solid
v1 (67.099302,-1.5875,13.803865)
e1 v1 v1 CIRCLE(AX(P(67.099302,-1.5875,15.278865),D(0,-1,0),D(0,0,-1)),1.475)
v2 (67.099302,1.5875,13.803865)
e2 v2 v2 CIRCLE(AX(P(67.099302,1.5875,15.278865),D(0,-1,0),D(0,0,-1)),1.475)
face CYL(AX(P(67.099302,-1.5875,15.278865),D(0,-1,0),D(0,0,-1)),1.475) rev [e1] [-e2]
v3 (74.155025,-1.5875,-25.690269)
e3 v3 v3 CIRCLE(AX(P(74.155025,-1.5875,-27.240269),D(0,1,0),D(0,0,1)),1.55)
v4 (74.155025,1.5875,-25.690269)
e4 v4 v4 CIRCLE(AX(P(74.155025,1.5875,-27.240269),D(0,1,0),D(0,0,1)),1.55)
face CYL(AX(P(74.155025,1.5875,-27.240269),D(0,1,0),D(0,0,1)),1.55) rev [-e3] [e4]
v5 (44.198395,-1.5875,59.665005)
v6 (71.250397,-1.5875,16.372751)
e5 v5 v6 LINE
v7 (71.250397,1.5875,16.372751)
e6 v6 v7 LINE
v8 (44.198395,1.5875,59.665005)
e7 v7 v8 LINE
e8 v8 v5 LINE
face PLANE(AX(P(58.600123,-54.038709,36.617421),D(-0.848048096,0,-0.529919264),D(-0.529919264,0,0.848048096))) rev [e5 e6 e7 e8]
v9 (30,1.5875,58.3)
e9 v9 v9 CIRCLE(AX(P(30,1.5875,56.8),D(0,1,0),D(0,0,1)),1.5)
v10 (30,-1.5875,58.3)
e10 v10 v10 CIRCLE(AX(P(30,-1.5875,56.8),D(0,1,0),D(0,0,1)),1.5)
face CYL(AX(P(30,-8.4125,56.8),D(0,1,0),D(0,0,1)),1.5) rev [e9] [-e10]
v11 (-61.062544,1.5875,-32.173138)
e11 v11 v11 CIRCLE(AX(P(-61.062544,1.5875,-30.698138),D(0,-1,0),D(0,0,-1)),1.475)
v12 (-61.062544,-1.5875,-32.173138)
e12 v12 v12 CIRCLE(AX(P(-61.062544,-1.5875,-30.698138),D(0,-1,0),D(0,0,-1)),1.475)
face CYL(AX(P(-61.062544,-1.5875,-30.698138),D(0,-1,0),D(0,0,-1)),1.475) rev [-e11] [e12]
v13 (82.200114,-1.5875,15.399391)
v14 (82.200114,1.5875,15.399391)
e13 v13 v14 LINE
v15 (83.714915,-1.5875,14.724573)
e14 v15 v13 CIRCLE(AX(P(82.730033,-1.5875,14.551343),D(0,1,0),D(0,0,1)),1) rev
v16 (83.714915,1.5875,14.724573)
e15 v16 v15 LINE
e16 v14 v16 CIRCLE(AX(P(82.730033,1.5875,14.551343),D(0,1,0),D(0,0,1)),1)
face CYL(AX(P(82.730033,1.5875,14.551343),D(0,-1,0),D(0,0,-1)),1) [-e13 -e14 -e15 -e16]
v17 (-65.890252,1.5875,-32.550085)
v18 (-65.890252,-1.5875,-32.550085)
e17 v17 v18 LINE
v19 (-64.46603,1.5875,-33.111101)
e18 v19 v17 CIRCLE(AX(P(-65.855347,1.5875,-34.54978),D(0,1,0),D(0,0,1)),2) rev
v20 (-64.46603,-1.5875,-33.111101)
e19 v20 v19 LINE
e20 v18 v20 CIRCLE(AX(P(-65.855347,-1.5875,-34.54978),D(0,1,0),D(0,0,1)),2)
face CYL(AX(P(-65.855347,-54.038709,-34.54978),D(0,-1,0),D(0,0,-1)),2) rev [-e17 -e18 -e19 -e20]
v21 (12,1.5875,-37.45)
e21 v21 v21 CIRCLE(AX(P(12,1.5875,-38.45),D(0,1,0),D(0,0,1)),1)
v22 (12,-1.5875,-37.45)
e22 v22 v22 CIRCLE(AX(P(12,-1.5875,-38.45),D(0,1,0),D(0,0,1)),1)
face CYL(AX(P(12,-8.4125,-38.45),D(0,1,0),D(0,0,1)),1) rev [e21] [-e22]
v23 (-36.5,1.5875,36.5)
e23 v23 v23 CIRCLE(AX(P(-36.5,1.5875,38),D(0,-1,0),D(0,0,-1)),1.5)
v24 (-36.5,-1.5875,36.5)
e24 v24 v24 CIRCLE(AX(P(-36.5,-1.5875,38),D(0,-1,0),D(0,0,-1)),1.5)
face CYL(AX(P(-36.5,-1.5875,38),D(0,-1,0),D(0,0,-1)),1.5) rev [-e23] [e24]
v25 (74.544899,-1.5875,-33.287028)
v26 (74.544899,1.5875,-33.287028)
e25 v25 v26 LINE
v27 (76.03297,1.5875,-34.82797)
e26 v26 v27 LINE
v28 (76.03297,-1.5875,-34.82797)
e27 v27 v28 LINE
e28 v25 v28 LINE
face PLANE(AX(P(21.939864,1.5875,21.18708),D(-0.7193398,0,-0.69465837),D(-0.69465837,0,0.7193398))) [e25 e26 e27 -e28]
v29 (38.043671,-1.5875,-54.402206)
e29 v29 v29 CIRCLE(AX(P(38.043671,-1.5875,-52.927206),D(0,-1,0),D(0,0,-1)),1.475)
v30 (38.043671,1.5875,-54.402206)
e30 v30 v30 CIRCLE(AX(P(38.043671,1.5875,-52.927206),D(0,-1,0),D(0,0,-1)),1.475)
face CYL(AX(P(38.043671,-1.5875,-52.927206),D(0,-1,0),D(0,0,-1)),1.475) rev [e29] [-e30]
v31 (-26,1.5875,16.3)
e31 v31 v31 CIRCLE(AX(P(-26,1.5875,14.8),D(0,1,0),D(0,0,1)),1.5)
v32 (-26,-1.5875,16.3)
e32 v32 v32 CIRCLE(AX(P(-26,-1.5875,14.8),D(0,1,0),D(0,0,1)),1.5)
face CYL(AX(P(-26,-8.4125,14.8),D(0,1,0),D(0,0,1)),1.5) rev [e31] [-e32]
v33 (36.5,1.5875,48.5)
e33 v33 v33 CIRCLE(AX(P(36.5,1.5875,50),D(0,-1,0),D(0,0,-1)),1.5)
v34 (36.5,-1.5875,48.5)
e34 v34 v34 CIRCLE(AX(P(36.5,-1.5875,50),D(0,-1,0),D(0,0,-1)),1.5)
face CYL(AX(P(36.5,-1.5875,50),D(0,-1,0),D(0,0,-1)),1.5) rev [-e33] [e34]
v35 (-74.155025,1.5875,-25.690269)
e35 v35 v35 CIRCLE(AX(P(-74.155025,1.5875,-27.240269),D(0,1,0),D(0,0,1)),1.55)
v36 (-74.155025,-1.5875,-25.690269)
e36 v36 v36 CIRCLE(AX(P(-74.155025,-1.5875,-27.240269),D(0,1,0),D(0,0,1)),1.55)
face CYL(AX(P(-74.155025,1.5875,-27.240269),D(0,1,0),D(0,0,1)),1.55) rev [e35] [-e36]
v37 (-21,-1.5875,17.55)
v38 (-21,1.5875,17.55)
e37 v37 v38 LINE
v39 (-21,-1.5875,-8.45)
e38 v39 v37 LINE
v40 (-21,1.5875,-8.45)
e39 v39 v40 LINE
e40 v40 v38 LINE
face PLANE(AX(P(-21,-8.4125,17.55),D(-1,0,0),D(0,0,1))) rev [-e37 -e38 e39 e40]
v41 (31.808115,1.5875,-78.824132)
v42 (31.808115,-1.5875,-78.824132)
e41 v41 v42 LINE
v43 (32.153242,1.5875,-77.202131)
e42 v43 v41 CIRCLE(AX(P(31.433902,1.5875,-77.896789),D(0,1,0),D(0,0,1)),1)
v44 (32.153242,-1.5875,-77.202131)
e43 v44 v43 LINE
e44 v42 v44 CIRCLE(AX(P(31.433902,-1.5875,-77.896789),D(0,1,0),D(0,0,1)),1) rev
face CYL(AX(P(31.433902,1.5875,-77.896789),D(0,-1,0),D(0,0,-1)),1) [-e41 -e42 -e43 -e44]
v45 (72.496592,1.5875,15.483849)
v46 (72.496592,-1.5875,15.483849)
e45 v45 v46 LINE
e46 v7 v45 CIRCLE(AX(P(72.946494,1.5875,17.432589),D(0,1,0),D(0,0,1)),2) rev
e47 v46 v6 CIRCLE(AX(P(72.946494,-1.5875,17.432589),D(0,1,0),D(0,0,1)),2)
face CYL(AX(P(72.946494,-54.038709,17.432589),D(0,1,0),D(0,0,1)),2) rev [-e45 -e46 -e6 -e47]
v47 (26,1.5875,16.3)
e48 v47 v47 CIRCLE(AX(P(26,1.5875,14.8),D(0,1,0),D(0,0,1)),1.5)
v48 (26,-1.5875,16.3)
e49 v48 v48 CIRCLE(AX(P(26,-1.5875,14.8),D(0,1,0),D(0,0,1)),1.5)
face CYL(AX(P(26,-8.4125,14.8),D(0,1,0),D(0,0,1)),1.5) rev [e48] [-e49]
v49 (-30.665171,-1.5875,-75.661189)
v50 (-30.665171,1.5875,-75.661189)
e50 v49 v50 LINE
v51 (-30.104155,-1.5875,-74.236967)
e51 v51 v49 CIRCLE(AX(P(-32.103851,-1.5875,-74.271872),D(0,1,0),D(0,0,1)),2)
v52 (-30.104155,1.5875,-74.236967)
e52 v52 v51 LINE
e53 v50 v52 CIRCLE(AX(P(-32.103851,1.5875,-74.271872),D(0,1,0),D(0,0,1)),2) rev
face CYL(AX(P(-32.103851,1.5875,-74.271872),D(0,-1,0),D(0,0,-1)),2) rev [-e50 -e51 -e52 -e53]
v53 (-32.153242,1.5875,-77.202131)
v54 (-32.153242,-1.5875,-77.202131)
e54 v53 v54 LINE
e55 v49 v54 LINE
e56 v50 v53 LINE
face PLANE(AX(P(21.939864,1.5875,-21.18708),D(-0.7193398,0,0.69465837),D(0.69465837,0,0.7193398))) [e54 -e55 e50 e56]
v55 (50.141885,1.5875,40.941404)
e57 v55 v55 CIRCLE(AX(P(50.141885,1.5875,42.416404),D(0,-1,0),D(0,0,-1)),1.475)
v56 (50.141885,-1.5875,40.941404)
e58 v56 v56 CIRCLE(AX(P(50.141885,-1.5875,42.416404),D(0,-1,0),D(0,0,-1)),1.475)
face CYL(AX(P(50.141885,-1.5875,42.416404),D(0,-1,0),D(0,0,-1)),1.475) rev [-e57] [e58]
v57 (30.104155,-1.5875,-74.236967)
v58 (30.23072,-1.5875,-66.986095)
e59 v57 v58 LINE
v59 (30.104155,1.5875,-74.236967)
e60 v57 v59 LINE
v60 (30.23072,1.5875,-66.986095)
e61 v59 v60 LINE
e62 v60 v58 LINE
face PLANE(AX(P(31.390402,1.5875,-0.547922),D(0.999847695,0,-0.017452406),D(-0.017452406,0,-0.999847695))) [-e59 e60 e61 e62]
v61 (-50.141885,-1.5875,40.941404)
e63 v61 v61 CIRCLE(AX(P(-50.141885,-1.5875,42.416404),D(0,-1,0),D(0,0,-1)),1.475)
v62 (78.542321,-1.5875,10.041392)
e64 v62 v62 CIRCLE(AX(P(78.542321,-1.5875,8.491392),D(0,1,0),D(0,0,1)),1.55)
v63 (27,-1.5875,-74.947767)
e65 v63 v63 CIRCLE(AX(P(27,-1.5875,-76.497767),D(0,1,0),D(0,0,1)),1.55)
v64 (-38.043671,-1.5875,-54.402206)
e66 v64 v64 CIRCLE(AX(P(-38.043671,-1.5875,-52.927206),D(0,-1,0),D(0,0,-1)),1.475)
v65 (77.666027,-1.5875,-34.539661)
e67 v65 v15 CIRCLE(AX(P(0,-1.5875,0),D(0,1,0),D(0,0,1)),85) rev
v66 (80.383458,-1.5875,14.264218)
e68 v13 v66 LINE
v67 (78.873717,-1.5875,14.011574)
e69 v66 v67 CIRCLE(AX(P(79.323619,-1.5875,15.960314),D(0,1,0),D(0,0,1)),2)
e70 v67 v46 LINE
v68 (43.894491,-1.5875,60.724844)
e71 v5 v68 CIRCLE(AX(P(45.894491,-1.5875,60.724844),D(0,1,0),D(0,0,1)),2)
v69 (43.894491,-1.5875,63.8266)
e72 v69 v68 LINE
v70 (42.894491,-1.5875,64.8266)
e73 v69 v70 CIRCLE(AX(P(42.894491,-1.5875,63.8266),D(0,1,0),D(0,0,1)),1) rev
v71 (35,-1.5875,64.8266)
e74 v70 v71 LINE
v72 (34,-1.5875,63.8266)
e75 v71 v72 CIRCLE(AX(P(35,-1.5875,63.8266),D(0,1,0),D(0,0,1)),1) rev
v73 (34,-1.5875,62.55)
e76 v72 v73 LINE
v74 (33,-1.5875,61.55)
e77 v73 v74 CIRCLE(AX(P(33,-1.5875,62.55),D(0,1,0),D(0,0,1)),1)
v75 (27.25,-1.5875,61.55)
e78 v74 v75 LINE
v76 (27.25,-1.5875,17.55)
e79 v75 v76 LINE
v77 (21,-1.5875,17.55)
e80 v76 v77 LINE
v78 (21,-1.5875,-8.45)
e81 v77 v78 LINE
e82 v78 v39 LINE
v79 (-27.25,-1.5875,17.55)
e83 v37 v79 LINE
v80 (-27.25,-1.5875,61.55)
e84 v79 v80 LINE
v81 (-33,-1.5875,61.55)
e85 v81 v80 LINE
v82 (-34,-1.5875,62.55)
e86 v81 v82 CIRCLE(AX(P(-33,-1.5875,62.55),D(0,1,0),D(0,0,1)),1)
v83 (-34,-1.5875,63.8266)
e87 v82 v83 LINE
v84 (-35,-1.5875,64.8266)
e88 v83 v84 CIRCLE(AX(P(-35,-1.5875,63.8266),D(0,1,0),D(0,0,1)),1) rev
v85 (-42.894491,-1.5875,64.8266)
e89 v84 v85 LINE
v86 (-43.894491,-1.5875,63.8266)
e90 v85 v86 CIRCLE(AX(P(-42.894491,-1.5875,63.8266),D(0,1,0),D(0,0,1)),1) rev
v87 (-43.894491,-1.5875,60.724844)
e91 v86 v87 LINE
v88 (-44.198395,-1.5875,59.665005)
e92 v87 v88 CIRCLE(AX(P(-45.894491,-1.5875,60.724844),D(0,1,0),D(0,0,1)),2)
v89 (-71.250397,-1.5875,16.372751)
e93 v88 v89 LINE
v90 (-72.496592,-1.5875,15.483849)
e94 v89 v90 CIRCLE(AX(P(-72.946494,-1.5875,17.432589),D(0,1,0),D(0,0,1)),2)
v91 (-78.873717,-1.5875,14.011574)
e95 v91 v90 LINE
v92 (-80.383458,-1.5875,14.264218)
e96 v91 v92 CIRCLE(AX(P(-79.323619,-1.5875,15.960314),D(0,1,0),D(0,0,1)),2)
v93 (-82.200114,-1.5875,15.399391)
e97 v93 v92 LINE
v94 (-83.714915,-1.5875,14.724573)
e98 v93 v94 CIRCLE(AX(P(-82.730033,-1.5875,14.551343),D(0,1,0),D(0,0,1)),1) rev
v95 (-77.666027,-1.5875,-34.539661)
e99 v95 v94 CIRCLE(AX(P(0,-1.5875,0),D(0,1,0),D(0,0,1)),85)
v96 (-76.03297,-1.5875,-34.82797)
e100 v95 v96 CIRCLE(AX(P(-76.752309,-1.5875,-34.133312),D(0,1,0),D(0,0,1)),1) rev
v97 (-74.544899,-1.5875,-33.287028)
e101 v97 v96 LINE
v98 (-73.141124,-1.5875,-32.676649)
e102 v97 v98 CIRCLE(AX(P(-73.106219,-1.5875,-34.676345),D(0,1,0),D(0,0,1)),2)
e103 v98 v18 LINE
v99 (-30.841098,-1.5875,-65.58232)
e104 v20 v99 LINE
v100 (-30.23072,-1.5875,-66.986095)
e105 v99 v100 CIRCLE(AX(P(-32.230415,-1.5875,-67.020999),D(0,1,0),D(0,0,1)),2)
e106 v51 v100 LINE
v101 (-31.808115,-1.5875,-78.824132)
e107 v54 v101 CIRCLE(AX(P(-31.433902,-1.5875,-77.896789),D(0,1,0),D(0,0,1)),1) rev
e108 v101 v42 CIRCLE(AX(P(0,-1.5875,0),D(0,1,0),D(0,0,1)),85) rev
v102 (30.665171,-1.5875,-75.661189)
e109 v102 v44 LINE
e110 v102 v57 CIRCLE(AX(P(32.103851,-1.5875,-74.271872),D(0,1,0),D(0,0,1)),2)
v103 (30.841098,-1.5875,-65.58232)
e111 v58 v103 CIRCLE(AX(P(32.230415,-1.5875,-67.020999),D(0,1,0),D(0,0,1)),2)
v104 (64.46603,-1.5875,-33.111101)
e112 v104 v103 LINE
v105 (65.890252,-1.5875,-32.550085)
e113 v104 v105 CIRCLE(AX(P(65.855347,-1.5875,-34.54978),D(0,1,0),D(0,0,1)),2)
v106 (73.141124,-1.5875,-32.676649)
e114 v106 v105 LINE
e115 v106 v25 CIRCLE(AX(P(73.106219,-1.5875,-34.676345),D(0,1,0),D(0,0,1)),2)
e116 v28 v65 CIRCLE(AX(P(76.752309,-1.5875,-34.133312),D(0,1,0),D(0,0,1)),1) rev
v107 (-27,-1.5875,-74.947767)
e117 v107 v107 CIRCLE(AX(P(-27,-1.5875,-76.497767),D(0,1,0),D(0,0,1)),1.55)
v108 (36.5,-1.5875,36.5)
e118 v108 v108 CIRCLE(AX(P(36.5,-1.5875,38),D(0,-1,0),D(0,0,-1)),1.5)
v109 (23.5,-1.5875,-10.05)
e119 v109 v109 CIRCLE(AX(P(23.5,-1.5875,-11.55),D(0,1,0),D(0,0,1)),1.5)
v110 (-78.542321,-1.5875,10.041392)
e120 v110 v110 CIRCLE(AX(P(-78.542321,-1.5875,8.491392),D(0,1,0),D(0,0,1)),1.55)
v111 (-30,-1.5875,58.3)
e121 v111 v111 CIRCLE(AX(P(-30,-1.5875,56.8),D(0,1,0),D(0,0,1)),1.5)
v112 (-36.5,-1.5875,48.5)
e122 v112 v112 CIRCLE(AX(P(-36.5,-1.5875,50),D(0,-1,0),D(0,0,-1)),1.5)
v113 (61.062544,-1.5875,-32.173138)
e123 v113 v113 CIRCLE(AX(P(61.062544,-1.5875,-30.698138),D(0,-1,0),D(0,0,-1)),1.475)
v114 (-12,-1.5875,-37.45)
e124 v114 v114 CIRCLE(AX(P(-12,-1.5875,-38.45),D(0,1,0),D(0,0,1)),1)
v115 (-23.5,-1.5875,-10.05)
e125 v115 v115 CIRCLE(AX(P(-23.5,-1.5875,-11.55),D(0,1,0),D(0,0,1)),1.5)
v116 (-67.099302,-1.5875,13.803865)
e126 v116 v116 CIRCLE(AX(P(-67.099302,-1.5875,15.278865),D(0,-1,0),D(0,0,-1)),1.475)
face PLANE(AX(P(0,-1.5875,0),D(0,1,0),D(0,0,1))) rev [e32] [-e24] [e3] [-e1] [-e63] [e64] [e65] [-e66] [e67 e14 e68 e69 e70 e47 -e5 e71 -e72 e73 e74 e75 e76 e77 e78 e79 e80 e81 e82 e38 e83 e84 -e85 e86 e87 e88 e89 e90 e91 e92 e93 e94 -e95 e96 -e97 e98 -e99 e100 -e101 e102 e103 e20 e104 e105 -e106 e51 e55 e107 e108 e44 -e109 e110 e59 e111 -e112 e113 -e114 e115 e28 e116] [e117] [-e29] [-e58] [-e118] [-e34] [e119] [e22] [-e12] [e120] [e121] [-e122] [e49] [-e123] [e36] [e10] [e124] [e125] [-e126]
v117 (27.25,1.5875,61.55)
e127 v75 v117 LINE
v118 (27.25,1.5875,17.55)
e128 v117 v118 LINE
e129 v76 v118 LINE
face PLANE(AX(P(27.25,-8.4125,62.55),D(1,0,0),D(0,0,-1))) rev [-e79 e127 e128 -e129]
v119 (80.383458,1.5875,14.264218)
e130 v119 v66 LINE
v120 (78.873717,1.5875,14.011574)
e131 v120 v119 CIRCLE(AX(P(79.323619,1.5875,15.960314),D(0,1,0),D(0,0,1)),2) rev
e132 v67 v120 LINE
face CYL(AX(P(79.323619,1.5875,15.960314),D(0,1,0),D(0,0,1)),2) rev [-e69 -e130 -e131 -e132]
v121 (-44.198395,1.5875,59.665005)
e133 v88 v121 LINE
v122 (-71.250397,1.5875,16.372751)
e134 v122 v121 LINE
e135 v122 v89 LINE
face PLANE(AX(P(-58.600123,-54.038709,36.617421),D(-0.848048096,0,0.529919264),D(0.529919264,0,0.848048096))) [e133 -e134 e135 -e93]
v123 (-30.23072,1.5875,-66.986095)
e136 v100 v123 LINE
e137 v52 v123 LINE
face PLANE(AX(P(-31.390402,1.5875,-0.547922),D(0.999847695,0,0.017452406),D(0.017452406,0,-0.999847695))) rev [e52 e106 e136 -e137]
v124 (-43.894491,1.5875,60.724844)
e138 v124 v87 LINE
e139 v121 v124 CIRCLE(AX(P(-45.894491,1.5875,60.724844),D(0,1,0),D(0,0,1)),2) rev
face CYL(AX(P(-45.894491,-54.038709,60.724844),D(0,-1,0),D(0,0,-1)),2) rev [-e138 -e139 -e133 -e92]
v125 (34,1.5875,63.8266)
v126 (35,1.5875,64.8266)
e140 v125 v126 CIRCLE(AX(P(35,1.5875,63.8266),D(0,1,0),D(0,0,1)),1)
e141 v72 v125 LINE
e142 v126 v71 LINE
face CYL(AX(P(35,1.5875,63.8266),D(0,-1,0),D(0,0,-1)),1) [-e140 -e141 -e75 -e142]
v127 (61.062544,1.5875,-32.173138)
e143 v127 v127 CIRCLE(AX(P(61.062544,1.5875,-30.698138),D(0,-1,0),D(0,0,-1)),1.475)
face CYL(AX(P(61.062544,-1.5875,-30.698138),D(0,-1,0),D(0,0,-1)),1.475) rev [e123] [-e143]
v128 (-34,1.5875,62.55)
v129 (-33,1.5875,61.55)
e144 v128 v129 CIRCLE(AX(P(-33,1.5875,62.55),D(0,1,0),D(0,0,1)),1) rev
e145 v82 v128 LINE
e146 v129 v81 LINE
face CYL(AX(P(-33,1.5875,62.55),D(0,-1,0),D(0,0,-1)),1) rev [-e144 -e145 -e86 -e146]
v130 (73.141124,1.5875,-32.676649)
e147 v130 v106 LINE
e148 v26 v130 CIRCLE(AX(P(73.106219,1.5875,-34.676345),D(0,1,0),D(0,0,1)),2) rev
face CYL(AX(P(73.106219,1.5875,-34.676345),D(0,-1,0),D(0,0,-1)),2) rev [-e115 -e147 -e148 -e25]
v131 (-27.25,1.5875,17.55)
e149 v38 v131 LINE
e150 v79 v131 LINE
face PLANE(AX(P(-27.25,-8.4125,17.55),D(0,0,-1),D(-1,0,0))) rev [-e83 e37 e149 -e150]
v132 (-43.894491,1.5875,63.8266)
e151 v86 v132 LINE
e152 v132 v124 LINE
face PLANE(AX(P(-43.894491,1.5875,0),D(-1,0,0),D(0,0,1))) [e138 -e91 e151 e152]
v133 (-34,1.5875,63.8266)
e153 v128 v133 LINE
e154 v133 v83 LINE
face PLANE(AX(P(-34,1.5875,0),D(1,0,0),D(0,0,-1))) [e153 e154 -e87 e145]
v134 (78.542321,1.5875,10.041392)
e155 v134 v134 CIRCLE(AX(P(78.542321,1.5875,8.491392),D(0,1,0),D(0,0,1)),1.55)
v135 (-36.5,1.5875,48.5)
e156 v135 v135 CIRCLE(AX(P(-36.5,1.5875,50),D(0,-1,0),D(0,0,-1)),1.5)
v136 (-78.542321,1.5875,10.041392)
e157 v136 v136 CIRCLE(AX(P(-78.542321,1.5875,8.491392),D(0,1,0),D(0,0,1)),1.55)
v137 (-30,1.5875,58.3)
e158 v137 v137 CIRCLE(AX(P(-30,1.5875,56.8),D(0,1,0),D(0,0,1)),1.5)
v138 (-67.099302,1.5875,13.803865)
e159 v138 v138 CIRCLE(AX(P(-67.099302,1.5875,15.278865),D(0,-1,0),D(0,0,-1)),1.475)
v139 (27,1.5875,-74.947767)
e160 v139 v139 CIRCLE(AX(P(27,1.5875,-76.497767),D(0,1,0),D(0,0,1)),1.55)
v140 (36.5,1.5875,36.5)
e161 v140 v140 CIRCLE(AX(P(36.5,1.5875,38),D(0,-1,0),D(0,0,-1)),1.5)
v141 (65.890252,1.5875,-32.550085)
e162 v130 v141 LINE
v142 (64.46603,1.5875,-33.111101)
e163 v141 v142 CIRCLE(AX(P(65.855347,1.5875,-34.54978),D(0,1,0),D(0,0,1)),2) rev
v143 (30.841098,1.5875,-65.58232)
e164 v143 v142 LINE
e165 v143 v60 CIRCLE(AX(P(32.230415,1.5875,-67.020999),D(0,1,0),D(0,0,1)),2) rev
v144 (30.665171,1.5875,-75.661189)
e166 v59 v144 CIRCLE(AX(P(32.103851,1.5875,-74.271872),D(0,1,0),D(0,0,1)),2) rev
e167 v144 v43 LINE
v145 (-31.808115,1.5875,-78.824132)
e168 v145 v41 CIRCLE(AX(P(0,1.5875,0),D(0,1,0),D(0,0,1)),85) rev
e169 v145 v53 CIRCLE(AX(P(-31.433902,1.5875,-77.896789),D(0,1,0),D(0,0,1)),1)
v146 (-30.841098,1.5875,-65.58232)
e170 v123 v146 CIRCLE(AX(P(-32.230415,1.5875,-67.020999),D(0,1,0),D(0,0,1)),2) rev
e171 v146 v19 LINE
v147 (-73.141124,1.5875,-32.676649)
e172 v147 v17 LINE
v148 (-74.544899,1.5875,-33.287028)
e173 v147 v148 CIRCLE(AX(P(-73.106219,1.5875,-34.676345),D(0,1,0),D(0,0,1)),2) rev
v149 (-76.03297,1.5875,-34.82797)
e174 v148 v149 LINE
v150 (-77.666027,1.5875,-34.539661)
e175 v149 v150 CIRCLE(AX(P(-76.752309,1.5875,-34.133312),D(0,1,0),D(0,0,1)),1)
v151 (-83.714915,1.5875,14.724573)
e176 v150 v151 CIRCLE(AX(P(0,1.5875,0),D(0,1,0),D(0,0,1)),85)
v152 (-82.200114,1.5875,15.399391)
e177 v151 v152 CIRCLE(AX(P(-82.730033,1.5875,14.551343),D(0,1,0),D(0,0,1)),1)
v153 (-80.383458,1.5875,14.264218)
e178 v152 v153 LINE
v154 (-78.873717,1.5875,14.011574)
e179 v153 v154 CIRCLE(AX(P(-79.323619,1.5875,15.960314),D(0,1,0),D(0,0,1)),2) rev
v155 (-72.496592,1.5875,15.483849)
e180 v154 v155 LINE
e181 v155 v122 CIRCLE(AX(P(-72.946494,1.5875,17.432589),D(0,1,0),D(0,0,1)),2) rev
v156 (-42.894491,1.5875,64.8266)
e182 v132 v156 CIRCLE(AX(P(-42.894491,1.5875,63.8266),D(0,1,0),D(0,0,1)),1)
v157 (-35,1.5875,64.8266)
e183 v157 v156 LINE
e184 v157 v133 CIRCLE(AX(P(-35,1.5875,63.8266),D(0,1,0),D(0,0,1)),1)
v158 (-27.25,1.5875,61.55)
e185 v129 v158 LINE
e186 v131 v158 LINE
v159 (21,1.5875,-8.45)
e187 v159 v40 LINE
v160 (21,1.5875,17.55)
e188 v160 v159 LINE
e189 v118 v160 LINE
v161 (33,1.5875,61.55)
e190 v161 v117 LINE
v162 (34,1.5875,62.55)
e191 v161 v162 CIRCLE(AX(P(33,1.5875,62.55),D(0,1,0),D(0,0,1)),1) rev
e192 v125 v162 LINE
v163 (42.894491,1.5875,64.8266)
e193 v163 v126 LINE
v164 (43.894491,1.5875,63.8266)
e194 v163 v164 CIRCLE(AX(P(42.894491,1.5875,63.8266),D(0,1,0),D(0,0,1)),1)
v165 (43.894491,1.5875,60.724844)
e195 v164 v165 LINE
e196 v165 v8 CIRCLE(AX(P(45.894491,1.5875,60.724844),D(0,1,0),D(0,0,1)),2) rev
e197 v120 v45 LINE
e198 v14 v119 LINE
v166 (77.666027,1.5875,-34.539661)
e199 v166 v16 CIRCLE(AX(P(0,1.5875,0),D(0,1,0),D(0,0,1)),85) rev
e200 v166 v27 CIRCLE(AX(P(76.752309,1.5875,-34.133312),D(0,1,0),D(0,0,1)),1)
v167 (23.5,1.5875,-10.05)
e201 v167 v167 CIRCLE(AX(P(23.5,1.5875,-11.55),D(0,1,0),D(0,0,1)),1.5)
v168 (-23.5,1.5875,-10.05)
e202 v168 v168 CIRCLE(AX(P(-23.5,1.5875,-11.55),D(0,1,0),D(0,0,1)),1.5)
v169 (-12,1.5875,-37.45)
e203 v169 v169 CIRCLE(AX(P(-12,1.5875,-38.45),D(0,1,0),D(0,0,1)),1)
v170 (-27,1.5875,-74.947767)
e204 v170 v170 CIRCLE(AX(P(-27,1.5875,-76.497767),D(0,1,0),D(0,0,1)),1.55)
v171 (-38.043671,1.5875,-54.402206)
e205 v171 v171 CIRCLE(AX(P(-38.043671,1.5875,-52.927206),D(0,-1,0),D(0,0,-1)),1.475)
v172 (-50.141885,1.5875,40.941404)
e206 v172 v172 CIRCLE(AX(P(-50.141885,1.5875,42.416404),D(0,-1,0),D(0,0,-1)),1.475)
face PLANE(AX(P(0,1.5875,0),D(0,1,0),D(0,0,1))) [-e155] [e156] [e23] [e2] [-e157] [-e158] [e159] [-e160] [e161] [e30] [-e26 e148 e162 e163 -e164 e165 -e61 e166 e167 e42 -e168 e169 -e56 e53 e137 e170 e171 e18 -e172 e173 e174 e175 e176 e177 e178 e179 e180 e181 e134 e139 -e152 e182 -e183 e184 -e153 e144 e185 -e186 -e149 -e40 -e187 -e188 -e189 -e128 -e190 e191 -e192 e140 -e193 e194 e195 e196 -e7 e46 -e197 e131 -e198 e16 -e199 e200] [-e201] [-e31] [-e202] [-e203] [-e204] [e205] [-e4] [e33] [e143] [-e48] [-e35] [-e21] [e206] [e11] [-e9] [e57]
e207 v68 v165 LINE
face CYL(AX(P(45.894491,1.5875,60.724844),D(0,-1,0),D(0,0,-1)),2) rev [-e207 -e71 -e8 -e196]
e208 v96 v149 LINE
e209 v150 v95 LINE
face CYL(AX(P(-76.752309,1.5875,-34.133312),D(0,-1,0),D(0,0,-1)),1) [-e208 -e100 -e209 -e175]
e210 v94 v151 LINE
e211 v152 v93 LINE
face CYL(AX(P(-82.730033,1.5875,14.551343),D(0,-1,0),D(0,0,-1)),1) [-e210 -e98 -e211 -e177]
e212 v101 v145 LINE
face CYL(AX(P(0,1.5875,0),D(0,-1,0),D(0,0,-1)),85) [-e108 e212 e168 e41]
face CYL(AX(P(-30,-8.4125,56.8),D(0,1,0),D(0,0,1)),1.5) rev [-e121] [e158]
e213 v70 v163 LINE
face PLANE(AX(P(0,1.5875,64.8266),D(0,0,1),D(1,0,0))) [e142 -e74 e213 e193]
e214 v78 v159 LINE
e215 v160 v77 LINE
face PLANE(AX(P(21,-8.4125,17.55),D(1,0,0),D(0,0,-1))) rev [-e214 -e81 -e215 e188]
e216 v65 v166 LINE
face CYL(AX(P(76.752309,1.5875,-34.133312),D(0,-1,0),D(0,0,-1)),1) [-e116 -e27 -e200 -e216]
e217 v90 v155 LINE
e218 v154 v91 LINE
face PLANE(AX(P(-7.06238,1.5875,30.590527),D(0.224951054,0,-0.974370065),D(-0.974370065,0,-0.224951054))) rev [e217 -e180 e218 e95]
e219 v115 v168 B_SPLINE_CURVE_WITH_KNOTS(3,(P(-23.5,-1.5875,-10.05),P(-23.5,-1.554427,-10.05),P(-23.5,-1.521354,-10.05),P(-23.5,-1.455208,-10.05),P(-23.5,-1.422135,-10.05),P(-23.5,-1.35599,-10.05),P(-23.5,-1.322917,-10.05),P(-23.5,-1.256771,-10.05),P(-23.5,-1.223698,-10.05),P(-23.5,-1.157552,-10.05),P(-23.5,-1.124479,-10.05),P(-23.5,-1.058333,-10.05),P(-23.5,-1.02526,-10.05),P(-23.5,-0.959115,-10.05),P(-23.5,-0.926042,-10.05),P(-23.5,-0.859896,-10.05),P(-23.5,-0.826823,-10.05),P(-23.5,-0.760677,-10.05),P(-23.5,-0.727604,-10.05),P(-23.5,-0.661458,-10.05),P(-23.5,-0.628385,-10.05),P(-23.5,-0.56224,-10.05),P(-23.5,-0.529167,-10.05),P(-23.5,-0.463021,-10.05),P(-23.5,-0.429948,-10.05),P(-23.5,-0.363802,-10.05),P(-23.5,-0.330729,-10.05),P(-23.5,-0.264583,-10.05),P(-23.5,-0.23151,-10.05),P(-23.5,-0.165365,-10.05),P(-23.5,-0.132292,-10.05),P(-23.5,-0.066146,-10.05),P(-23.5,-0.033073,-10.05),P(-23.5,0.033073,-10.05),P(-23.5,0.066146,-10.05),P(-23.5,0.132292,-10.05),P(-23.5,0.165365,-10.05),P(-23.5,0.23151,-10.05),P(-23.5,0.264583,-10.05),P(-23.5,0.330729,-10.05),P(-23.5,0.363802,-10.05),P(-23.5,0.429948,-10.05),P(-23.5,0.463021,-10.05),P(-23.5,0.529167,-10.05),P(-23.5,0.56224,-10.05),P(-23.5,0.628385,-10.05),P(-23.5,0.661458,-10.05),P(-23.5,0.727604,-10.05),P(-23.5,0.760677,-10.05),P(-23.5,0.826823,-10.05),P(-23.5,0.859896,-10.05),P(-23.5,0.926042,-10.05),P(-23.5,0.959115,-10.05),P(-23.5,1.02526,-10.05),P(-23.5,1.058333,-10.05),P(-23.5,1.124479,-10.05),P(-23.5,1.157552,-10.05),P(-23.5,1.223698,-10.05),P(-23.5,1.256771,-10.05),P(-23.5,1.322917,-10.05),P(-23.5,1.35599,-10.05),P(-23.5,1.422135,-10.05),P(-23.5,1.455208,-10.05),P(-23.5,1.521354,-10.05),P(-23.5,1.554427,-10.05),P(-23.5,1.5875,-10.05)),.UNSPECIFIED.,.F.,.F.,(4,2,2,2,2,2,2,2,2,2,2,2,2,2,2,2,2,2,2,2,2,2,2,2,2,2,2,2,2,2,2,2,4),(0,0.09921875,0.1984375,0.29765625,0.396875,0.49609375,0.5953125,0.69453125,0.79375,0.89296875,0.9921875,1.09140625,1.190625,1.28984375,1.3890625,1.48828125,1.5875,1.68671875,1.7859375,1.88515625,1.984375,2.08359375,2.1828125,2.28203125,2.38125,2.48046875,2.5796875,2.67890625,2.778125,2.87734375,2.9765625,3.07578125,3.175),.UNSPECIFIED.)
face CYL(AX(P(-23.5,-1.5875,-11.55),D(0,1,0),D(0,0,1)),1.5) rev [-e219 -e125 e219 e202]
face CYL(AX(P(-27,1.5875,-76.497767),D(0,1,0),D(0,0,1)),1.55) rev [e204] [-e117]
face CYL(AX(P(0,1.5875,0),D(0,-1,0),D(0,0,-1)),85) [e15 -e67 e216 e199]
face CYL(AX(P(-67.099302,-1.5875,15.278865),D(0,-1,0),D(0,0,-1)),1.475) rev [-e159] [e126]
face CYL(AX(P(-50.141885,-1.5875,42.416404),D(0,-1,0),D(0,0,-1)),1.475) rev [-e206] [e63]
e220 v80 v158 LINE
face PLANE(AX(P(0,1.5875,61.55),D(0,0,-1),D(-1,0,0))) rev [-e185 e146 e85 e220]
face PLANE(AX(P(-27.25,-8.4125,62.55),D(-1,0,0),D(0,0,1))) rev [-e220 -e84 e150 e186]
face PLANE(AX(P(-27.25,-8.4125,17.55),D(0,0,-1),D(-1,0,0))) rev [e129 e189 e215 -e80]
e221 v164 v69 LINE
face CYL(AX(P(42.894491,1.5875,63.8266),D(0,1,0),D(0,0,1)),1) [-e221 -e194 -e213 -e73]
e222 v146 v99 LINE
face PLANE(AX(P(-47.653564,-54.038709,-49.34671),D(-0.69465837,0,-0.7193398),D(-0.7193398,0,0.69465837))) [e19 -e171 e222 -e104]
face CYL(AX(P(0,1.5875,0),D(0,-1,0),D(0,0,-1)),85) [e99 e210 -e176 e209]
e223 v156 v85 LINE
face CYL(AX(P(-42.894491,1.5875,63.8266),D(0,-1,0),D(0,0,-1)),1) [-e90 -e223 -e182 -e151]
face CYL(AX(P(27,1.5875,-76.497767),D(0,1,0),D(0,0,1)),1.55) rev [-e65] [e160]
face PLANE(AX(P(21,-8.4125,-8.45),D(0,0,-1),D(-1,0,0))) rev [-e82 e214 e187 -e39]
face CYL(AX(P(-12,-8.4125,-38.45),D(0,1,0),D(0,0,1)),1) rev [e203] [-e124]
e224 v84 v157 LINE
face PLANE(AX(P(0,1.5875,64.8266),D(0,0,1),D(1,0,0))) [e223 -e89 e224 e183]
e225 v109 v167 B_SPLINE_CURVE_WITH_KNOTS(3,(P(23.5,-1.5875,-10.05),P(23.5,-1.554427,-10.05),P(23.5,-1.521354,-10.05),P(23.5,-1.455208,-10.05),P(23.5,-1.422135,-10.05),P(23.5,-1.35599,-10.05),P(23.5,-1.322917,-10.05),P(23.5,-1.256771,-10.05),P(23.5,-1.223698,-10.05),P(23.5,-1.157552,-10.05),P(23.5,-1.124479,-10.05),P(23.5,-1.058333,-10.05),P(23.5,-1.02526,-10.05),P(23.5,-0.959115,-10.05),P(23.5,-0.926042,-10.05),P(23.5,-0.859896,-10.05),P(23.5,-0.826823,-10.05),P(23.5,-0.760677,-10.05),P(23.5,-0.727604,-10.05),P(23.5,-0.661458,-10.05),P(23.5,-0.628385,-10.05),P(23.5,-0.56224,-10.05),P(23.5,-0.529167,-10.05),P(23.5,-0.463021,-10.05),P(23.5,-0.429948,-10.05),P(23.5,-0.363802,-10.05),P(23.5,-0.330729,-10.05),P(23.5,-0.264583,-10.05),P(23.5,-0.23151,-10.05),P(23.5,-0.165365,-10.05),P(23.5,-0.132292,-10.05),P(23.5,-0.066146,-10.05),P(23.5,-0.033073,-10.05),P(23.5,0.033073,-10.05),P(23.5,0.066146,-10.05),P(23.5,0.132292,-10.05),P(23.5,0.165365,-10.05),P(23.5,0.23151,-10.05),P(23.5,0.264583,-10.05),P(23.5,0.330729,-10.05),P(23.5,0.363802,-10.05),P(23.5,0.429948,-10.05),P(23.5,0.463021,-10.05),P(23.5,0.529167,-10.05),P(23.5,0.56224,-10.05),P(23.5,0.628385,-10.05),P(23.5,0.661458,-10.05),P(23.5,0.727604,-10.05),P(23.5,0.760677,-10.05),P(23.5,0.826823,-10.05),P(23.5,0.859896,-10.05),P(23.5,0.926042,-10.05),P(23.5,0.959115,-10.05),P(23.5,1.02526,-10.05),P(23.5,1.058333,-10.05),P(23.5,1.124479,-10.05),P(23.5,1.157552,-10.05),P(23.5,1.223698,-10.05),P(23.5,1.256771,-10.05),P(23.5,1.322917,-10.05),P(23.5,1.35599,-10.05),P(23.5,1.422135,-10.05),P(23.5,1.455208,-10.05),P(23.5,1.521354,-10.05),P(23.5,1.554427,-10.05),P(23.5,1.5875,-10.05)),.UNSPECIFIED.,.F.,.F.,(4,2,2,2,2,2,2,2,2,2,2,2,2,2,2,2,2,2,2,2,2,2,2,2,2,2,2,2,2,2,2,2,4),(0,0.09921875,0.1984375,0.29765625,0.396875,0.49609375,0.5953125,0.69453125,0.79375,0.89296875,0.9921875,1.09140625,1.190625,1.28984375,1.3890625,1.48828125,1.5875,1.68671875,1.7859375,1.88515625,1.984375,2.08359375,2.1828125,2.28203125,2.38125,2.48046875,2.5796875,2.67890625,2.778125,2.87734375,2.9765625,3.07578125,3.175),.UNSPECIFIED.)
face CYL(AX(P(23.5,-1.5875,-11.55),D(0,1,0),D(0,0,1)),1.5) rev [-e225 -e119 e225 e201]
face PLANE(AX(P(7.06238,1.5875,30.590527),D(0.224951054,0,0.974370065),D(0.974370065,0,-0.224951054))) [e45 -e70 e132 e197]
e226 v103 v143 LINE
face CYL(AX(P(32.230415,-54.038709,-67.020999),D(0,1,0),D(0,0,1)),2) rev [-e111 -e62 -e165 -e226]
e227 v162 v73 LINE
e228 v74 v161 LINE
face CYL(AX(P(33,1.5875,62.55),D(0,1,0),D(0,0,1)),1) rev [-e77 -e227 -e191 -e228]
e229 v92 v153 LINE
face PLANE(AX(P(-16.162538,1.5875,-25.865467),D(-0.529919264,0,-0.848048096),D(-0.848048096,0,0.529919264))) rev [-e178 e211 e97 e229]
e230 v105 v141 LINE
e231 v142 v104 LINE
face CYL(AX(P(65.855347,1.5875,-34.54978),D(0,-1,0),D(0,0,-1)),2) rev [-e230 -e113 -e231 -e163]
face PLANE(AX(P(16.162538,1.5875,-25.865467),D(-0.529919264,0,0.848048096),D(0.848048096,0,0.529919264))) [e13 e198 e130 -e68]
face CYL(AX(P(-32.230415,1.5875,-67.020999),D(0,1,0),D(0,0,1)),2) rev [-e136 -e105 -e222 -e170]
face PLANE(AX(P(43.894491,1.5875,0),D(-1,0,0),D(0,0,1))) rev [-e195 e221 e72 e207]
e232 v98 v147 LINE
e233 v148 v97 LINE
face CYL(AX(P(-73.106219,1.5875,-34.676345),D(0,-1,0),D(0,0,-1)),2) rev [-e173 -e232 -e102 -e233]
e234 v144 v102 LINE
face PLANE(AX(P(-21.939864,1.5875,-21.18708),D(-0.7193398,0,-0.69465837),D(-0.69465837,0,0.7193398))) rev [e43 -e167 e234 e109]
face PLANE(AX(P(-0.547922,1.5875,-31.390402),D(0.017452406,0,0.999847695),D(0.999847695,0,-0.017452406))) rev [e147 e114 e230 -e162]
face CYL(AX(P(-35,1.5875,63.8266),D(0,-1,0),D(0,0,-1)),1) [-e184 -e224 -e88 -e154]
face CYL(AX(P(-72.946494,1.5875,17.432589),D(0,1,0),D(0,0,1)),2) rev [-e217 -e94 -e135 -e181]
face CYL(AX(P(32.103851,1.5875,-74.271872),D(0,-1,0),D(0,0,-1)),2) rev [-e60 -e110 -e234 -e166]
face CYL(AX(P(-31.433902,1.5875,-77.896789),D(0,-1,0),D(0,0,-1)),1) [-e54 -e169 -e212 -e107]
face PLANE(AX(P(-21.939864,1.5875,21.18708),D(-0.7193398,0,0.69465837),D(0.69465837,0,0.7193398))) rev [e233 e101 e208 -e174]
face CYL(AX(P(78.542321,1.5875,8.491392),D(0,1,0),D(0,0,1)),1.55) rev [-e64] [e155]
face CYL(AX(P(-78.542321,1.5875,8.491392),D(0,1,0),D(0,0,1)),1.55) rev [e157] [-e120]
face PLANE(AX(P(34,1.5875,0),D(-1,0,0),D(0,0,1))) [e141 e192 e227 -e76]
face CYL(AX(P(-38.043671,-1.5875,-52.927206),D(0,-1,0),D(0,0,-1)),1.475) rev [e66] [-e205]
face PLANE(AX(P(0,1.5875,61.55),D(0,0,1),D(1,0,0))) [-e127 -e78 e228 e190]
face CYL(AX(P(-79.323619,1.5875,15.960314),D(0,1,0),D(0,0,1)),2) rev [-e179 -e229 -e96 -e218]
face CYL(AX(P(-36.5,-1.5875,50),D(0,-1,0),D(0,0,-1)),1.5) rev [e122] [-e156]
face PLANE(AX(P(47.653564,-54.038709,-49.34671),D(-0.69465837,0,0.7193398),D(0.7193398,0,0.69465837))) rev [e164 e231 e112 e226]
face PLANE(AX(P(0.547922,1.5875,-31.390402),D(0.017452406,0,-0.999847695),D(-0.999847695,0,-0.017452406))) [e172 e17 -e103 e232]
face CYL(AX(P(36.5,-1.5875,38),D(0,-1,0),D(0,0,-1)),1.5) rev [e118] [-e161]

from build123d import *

# Parameters (mm, degrees)
BOSS_EXTRUDE4_DEPTH  = 1.5875
M3_CLEARANCE_HOLE3_D = 3
M3_CLEARANCE_HOLE1_D = 3.1
M3_CLEARANCE_HOLE4_D = 2.95
M3_CLEARANCE_HOLE2_D = 3.1
BOSS_EXTRUDE6_DEPTH  = 3.175
FILLET1_R            = 2
FILLET3_R            = 1
FILLET6_R            = 0.5
SKETCH28_W           = 54.5
SKETCH28_H           = 45
CUT_EXTRUDE4_DEPTH   = 10
CUT_EXTRUDE5_DEPTH   = 10
SKETCH30_W           = 42
SKETCH30_H           = 26
CUT_EXTRUDE6_DEPTH   = 10
SKETCH31_R           = 1.5
CUT_EXTRUDE7_DEPTH   = 10
SKETCH34_R           = 1
CUT_EXTRUDE9_DEPTH   = 10
SKETCH35_R           = 1.5
CUT_EXTRUDE10_DEPTH  = 121.250075508


with BuildPart() as part:
    # Sketch1 → Boss-Extrude4 (new, symmetric)
    with BuildSketch(Plane(origin=(0, 0, 0), x_dir=(1, 0, 0), z_dir=(0, 1, 0))):
        with BuildLine():
            Line((-62.799553621, 32.496136604), (-73.969425011, 32.691107434))
            Line((-73.969425011, 32.691107434), (-77.053684287, 35.88495141))
            ThreePointArc((-77.053684287, 35.88495141), (-84.36642289, 10.358894189), (-83.446216027, -16.178041625))
            Line((-83.446216027, -16.178041625), (-79.680911643, -13.825218315))
            Line((-79.680911643, -13.825218315), (-69.484649137, -16.179210996))
            Line((-69.484649137, -16.179210996), (-43.894490772, -57.132025032))
            Line((-43.894490772, -57.132025032), (-43.894490772, -64.826600275))
            Line((-43.894490772, -64.826600275), (-43.094490772, -64.826600275))
            Line((-43.094490772, -64.826600275), (-34, -64.826600275))
            Line((-34, -64.826600275), (-34, -62.55))
            Line((-34, -62.55), (-34, -61.55))
            Line((-34, -61.55), (-20, -61.55))
            Line((-20, -61.55), (-19.859459165, -62.55))
            Line((-19.859459165, -62.55), (19.859459165, -62.55))
            Line((19.859459165, -62.55), (20, -61.55))
            Line((20, -61.55), (34, -61.55))
            Line((34, -61.55), (34, -62.55))
            Line((34, -62.55), (34, -64.826600275))
            Line((34, -64.826600275), (43.094490772, -64.826600275))
            Line((43.094490772, -64.826600275), (43.894490772, -64.826600275))
            Line((43.894490772, -64.826600275), (43.894490772, -57.132025032))
            Line((43.894490772, -57.132025032), (69.484649137, -16.179210996))
            Line((69.484649137, -16.179210996), (79.680911643, -13.825218315))
            Line((79.680911643, -13.825218315), (83.446216027, -16.178041625))
            ThreePointArc((83.446216027, -16.178041625), (84.610662337, -8.126242604), (85, 0))
            ThreePointArc((85, 0), (82.98964744, 18.377116688), (77.053684287, 35.88495141))
            Line((77.053684287, 35.88495141), (73.969425011, 32.691107434))
            Line((73.969425011, 32.691107434), (62.799553621, 32.496136604))
            Line((62.799553621, 32.496136604), (30.284668021, 63.895396642))
            Line((30.284668021, 63.895396642), (30.089697191, 75.065268032))
            Line((30.089697191, 75.065268032), (33.173956467, 78.259112008))
            ThreePointArc((33.173956467, 78.259112008), (0, 85), (-33.173956467, 78.259112008))
            Line((-33.173956467, 78.259112008), (-30.089697191, 75.065268032))
            Line((-30.089697191, 75.065268032), (-30.284668021, 63.895396642))
            Line((-30.284668021, 63.895396642), (-62.799553621, 32.496136604))
        make_face()
    extrude(amount=BOSS_EXTRUDE4_DEPTH, both=True)

    # M3 Clearance Hole3 (through all)
    with Locations(Plane(origin=(0, -1.5875, 0), x_dir=(-1, 0, 0), z_dir=(0, -1, 0))):
        with Locations((36.5, -50), (36.5, -38), (-36.5, -50), (-36.5, -38)):
            Hole(M3_CLEARANCE_HOLE3_D / 2)

    # M3 Clearance Hole1 (through all)
    with Locations(Plane(origin=(0, 1.5875, 0), x_dir=(1, 0, 0), z_dir=(0, 1, 0))):
        with Locations((-78.542321426, -8.49139241), (78.542321426, -8.49139241), (74.155025063, 27.240269049), (-74.155025063, 27.240269049)):
            Hole(M3_CLEARANCE_HOLE1_D / 2)

    # M3 Clearance Hole4 (through all)
    with Locations(Plane(origin=(0, -1.5875, 0), x_dir=(-1, 0, 0), z_dir=(0, -1, 0))):
        with Locations((-67.099301622, -15.278865202), (-50.141885166, -42.416404279), (-61.062544382, 30.698137949), (-38.043670771, 52.927205804), (50.141885166, -42.416404279), (67.099301622, -15.278865202), (38.043670771, 52.927205804), (61.062544382, 30.698137949)):
            Hole(M3_CLEARANCE_HOLE4_D / 2)

    # M3 Clearance Hole2 (through all)
    with Locations(Plane(origin=(0, 1.5875, 0), x_dir=(1, 0, 0), z_dir=(0, 1, 0))):
        with Locations((27, 76.497766718), (-27, 76.497766718)):
            Hole(M3_CLEARANCE_HOLE2_D / 2)

    # Sketch22 → Boss-Extrude6 (add)
    with BuildSketch(Plane(origin=(0, 1.5875, 0), x_dir=(1, 0, 0), z_dir=(0, 1, 0))):
        Polygon((65.061950694, 32.535626892), (30.245177733, 66.157793715), (30.284668021, 63.895396642), (62.799553621, 32.496136604), align=None)
        Polygon((-30.284668021, 63.895396642), (-30.245177733, 66.157793715), (-65.061950694, 32.535626892), (-62.799553621, 32.496136604), align=None)
        Polygon((43.894490772, -60.151352895), (71.689396914, -15.670204865), (69.484649137, -16.179210996), (43.894490772, -57.132025032), align=None)
        Polygon((-69.484649137, -16.179210996), (-71.689396914, -15.670204865), (-43.894490772, -60.151352895), (-43.894490772, -57.132025032), align=None)
    extrude(amount=-BOSS_EXTRUDE6_DEPTH)

    # Fillet1
    fillet1_edges = [part.edges().sort_by_distance(p)[0] for p in [
        (-30.245177733, 0.79375, -66.157793715),
        (-65.061950694, 0.79375, -32.535626892),
        (-71.689396914, 0.79375, 15.670204865),
        (-43.894490772, 0.79375, 60.151352895),
        (43.894490772, -0.79375, 60.151352895),
        (71.689396914, -0.79375, 15.670204865),
        (65.061950694, 0.79375, -32.535626892),
        (30.245177733, -0.79375, -66.157793715),
        (30.089697191, -0.79375, -75.065268032),
        (73.969425011, -0.79375, -32.691107434),
        (79.680911643, -0.79375, 13.825218315),
        (-79.680911643, -0.79375, 13.825218315),
        (-73.969425011, -0.79375, -32.691107434),
        (-30.089697191, -0.79375, -75.065268032),
    ]]
    fillet(fillet1_edges, radius=FILLET1_R)

    # Fillet3
    fillet3_edges = [part.edges().sort_by_distance(p)[0] for p in [
        (33.173956467, -0.79375, -78.259112008),
        (77.053684287, 0.79375, -35.88495141),
        (83.446216027, -0.79375, 16.178041625),
        (43.894490772, -0.79375, 64.826600275),
        (34, 0.79375, 64.826600275),
        (34, -0.79375, 61.55),
        (-34, -0.79375, 61.55),
        (-34, 0.79375, 64.826600275),
        (-43.894490772, -0.79375, 64.826600275),
        (-83.446216027, -0.79375, 16.178041625),
        (-77.053684287, -0.79375, -35.88495141),
        (-33.173956467, -0.79375, -78.259112008),
    ]]
    fillet(fillet3_edges, radius=FILLET3_R - 0.0001)  # a hair under: the kernel refuses the full size

    # Fillet6
    fillet6_edges = [part.edges().sort_by_distance(p)[0] for p in [
        (20, -0.79375, 61.55),
        (19.859459165, -0.79375, 62.55),
        (-19.859459165, 0.79375, 62.55),
        (-20, 0.79375, 61.55),
    ]]
    fillet(fillet6_edges, radius=FILLET6_R)

    # Sketch28 → Cut-Extrude4 (cut)
    with BuildSketch(Plane(origin=(0, 1.5875, 0), x_dir=(1, 0, 0), z_dir=(0, 1, 0))):
        with Locations((0, -40.05)):
            Rectangle(SKETCH28_W, SKETCH28_H)
    extrude(amount=-CUT_EXTRUDE4_DEPTH, mode=Mode.SUBTRACT)

    # Sketch29 → Cut-Extrude5 (cut)
    with BuildSketch(Plane(origin=(0, 1.5875, 0), x_dir=(1, 0, 0), z_dir=(0, 1, 0))):
        with BuildLine():
            ThreePointArc((-31.5, -56.8), (-30, -58.3), (-28.5, -56.8))
            Line((-28.5, -56.8), (-30, -56.8))
            Line((-30, -56.8), (-31.5, -56.8))
        make_face()
        with BuildLine():
            Line((-30, -56.8), (-28.5, -56.8))
            ThreePointArc((-28.5, -56.8), (-30, -55.3), (-31.5, -56.8))
            Line((-31.5, -56.8), (-30, -56.8))
        make_face()
        with BuildLine():
            ThreePointArc((28.5, -56.8), (30, -58.3), (31.5, -56.8))
            ThreePointArc((31.5, -56.8), (30, -55.3), (28.5, -56.8))
        make_face()
    extrude(amount=-CUT_EXTRUDE5_DEPTH, mode=Mode.SUBTRACT)

    # Sketch30 → Cut-Extrude6 (cut)
    with BuildSketch(Plane(origin=(0, 1.5875, 0), x_dir=(1, 0, 0), z_dir=(0, 1, 0))):
        with Locations((0, -4.55)):
            Rectangle(SKETCH30_W, SKETCH30_H)
    extrude(amount=-CUT_EXTRUDE6_DEPTH, mode=Mode.SUBTRACT)

    # Sketch31 → Cut-Extrude7 (cut)
    with BuildSketch(Plane(origin=(0, 1.5875, 0), x_dir=(1, 0, 0), z_dir=(0, 1, 0))):
        with Locations(Location((-26, -14.8, 0), (0, 0, 270))):
            Circle(SKETCH31_R)
        with Locations(Location((26, -14.8, 0), (0, 0, 270))):
            Circle(SKETCH31_R)
    extrude(amount=-CUT_EXTRUDE7_DEPTH, mode=Mode.SUBTRACT)

    # Sketch34 → Cut-Extrude9 (cut)
    with BuildSketch(Plane(origin=(0, 1.5875, 0), x_dir=(1, 0, 0), z_dir=(0, 1, 0))):
        with Locations(Location((-12, 38.45, 0), (0, 0, 270))):
            Circle(SKETCH34_R)
        with Locations(Location((12, 38.45, 0), (0, 0, 270))):
            Circle(SKETCH34_R)
    extrude(amount=-CUT_EXTRUDE9_DEPTH, mode=Mode.SUBTRACT)

    # Sketch35 → Cut-Extrude10 (cut, through all)
    with BuildSketch(Plane(origin=(0, 1.5875, 0), x_dir=(1, 0, 0), z_dir=(0, 1, 0))):
        with Locations(Location((-23.5, 11.55, 0), (0, 0, 270))):
            Circle(SKETCH35_R)
        with Locations(Location((23.5, 11.55, 0), (0, 0, 270))):
            Circle(SKETCH35_R)
    extrude(amount=-CUT_EXTRUDE10_DEPTH, mode=Mode.SUBTRACT)


solid = part.part
